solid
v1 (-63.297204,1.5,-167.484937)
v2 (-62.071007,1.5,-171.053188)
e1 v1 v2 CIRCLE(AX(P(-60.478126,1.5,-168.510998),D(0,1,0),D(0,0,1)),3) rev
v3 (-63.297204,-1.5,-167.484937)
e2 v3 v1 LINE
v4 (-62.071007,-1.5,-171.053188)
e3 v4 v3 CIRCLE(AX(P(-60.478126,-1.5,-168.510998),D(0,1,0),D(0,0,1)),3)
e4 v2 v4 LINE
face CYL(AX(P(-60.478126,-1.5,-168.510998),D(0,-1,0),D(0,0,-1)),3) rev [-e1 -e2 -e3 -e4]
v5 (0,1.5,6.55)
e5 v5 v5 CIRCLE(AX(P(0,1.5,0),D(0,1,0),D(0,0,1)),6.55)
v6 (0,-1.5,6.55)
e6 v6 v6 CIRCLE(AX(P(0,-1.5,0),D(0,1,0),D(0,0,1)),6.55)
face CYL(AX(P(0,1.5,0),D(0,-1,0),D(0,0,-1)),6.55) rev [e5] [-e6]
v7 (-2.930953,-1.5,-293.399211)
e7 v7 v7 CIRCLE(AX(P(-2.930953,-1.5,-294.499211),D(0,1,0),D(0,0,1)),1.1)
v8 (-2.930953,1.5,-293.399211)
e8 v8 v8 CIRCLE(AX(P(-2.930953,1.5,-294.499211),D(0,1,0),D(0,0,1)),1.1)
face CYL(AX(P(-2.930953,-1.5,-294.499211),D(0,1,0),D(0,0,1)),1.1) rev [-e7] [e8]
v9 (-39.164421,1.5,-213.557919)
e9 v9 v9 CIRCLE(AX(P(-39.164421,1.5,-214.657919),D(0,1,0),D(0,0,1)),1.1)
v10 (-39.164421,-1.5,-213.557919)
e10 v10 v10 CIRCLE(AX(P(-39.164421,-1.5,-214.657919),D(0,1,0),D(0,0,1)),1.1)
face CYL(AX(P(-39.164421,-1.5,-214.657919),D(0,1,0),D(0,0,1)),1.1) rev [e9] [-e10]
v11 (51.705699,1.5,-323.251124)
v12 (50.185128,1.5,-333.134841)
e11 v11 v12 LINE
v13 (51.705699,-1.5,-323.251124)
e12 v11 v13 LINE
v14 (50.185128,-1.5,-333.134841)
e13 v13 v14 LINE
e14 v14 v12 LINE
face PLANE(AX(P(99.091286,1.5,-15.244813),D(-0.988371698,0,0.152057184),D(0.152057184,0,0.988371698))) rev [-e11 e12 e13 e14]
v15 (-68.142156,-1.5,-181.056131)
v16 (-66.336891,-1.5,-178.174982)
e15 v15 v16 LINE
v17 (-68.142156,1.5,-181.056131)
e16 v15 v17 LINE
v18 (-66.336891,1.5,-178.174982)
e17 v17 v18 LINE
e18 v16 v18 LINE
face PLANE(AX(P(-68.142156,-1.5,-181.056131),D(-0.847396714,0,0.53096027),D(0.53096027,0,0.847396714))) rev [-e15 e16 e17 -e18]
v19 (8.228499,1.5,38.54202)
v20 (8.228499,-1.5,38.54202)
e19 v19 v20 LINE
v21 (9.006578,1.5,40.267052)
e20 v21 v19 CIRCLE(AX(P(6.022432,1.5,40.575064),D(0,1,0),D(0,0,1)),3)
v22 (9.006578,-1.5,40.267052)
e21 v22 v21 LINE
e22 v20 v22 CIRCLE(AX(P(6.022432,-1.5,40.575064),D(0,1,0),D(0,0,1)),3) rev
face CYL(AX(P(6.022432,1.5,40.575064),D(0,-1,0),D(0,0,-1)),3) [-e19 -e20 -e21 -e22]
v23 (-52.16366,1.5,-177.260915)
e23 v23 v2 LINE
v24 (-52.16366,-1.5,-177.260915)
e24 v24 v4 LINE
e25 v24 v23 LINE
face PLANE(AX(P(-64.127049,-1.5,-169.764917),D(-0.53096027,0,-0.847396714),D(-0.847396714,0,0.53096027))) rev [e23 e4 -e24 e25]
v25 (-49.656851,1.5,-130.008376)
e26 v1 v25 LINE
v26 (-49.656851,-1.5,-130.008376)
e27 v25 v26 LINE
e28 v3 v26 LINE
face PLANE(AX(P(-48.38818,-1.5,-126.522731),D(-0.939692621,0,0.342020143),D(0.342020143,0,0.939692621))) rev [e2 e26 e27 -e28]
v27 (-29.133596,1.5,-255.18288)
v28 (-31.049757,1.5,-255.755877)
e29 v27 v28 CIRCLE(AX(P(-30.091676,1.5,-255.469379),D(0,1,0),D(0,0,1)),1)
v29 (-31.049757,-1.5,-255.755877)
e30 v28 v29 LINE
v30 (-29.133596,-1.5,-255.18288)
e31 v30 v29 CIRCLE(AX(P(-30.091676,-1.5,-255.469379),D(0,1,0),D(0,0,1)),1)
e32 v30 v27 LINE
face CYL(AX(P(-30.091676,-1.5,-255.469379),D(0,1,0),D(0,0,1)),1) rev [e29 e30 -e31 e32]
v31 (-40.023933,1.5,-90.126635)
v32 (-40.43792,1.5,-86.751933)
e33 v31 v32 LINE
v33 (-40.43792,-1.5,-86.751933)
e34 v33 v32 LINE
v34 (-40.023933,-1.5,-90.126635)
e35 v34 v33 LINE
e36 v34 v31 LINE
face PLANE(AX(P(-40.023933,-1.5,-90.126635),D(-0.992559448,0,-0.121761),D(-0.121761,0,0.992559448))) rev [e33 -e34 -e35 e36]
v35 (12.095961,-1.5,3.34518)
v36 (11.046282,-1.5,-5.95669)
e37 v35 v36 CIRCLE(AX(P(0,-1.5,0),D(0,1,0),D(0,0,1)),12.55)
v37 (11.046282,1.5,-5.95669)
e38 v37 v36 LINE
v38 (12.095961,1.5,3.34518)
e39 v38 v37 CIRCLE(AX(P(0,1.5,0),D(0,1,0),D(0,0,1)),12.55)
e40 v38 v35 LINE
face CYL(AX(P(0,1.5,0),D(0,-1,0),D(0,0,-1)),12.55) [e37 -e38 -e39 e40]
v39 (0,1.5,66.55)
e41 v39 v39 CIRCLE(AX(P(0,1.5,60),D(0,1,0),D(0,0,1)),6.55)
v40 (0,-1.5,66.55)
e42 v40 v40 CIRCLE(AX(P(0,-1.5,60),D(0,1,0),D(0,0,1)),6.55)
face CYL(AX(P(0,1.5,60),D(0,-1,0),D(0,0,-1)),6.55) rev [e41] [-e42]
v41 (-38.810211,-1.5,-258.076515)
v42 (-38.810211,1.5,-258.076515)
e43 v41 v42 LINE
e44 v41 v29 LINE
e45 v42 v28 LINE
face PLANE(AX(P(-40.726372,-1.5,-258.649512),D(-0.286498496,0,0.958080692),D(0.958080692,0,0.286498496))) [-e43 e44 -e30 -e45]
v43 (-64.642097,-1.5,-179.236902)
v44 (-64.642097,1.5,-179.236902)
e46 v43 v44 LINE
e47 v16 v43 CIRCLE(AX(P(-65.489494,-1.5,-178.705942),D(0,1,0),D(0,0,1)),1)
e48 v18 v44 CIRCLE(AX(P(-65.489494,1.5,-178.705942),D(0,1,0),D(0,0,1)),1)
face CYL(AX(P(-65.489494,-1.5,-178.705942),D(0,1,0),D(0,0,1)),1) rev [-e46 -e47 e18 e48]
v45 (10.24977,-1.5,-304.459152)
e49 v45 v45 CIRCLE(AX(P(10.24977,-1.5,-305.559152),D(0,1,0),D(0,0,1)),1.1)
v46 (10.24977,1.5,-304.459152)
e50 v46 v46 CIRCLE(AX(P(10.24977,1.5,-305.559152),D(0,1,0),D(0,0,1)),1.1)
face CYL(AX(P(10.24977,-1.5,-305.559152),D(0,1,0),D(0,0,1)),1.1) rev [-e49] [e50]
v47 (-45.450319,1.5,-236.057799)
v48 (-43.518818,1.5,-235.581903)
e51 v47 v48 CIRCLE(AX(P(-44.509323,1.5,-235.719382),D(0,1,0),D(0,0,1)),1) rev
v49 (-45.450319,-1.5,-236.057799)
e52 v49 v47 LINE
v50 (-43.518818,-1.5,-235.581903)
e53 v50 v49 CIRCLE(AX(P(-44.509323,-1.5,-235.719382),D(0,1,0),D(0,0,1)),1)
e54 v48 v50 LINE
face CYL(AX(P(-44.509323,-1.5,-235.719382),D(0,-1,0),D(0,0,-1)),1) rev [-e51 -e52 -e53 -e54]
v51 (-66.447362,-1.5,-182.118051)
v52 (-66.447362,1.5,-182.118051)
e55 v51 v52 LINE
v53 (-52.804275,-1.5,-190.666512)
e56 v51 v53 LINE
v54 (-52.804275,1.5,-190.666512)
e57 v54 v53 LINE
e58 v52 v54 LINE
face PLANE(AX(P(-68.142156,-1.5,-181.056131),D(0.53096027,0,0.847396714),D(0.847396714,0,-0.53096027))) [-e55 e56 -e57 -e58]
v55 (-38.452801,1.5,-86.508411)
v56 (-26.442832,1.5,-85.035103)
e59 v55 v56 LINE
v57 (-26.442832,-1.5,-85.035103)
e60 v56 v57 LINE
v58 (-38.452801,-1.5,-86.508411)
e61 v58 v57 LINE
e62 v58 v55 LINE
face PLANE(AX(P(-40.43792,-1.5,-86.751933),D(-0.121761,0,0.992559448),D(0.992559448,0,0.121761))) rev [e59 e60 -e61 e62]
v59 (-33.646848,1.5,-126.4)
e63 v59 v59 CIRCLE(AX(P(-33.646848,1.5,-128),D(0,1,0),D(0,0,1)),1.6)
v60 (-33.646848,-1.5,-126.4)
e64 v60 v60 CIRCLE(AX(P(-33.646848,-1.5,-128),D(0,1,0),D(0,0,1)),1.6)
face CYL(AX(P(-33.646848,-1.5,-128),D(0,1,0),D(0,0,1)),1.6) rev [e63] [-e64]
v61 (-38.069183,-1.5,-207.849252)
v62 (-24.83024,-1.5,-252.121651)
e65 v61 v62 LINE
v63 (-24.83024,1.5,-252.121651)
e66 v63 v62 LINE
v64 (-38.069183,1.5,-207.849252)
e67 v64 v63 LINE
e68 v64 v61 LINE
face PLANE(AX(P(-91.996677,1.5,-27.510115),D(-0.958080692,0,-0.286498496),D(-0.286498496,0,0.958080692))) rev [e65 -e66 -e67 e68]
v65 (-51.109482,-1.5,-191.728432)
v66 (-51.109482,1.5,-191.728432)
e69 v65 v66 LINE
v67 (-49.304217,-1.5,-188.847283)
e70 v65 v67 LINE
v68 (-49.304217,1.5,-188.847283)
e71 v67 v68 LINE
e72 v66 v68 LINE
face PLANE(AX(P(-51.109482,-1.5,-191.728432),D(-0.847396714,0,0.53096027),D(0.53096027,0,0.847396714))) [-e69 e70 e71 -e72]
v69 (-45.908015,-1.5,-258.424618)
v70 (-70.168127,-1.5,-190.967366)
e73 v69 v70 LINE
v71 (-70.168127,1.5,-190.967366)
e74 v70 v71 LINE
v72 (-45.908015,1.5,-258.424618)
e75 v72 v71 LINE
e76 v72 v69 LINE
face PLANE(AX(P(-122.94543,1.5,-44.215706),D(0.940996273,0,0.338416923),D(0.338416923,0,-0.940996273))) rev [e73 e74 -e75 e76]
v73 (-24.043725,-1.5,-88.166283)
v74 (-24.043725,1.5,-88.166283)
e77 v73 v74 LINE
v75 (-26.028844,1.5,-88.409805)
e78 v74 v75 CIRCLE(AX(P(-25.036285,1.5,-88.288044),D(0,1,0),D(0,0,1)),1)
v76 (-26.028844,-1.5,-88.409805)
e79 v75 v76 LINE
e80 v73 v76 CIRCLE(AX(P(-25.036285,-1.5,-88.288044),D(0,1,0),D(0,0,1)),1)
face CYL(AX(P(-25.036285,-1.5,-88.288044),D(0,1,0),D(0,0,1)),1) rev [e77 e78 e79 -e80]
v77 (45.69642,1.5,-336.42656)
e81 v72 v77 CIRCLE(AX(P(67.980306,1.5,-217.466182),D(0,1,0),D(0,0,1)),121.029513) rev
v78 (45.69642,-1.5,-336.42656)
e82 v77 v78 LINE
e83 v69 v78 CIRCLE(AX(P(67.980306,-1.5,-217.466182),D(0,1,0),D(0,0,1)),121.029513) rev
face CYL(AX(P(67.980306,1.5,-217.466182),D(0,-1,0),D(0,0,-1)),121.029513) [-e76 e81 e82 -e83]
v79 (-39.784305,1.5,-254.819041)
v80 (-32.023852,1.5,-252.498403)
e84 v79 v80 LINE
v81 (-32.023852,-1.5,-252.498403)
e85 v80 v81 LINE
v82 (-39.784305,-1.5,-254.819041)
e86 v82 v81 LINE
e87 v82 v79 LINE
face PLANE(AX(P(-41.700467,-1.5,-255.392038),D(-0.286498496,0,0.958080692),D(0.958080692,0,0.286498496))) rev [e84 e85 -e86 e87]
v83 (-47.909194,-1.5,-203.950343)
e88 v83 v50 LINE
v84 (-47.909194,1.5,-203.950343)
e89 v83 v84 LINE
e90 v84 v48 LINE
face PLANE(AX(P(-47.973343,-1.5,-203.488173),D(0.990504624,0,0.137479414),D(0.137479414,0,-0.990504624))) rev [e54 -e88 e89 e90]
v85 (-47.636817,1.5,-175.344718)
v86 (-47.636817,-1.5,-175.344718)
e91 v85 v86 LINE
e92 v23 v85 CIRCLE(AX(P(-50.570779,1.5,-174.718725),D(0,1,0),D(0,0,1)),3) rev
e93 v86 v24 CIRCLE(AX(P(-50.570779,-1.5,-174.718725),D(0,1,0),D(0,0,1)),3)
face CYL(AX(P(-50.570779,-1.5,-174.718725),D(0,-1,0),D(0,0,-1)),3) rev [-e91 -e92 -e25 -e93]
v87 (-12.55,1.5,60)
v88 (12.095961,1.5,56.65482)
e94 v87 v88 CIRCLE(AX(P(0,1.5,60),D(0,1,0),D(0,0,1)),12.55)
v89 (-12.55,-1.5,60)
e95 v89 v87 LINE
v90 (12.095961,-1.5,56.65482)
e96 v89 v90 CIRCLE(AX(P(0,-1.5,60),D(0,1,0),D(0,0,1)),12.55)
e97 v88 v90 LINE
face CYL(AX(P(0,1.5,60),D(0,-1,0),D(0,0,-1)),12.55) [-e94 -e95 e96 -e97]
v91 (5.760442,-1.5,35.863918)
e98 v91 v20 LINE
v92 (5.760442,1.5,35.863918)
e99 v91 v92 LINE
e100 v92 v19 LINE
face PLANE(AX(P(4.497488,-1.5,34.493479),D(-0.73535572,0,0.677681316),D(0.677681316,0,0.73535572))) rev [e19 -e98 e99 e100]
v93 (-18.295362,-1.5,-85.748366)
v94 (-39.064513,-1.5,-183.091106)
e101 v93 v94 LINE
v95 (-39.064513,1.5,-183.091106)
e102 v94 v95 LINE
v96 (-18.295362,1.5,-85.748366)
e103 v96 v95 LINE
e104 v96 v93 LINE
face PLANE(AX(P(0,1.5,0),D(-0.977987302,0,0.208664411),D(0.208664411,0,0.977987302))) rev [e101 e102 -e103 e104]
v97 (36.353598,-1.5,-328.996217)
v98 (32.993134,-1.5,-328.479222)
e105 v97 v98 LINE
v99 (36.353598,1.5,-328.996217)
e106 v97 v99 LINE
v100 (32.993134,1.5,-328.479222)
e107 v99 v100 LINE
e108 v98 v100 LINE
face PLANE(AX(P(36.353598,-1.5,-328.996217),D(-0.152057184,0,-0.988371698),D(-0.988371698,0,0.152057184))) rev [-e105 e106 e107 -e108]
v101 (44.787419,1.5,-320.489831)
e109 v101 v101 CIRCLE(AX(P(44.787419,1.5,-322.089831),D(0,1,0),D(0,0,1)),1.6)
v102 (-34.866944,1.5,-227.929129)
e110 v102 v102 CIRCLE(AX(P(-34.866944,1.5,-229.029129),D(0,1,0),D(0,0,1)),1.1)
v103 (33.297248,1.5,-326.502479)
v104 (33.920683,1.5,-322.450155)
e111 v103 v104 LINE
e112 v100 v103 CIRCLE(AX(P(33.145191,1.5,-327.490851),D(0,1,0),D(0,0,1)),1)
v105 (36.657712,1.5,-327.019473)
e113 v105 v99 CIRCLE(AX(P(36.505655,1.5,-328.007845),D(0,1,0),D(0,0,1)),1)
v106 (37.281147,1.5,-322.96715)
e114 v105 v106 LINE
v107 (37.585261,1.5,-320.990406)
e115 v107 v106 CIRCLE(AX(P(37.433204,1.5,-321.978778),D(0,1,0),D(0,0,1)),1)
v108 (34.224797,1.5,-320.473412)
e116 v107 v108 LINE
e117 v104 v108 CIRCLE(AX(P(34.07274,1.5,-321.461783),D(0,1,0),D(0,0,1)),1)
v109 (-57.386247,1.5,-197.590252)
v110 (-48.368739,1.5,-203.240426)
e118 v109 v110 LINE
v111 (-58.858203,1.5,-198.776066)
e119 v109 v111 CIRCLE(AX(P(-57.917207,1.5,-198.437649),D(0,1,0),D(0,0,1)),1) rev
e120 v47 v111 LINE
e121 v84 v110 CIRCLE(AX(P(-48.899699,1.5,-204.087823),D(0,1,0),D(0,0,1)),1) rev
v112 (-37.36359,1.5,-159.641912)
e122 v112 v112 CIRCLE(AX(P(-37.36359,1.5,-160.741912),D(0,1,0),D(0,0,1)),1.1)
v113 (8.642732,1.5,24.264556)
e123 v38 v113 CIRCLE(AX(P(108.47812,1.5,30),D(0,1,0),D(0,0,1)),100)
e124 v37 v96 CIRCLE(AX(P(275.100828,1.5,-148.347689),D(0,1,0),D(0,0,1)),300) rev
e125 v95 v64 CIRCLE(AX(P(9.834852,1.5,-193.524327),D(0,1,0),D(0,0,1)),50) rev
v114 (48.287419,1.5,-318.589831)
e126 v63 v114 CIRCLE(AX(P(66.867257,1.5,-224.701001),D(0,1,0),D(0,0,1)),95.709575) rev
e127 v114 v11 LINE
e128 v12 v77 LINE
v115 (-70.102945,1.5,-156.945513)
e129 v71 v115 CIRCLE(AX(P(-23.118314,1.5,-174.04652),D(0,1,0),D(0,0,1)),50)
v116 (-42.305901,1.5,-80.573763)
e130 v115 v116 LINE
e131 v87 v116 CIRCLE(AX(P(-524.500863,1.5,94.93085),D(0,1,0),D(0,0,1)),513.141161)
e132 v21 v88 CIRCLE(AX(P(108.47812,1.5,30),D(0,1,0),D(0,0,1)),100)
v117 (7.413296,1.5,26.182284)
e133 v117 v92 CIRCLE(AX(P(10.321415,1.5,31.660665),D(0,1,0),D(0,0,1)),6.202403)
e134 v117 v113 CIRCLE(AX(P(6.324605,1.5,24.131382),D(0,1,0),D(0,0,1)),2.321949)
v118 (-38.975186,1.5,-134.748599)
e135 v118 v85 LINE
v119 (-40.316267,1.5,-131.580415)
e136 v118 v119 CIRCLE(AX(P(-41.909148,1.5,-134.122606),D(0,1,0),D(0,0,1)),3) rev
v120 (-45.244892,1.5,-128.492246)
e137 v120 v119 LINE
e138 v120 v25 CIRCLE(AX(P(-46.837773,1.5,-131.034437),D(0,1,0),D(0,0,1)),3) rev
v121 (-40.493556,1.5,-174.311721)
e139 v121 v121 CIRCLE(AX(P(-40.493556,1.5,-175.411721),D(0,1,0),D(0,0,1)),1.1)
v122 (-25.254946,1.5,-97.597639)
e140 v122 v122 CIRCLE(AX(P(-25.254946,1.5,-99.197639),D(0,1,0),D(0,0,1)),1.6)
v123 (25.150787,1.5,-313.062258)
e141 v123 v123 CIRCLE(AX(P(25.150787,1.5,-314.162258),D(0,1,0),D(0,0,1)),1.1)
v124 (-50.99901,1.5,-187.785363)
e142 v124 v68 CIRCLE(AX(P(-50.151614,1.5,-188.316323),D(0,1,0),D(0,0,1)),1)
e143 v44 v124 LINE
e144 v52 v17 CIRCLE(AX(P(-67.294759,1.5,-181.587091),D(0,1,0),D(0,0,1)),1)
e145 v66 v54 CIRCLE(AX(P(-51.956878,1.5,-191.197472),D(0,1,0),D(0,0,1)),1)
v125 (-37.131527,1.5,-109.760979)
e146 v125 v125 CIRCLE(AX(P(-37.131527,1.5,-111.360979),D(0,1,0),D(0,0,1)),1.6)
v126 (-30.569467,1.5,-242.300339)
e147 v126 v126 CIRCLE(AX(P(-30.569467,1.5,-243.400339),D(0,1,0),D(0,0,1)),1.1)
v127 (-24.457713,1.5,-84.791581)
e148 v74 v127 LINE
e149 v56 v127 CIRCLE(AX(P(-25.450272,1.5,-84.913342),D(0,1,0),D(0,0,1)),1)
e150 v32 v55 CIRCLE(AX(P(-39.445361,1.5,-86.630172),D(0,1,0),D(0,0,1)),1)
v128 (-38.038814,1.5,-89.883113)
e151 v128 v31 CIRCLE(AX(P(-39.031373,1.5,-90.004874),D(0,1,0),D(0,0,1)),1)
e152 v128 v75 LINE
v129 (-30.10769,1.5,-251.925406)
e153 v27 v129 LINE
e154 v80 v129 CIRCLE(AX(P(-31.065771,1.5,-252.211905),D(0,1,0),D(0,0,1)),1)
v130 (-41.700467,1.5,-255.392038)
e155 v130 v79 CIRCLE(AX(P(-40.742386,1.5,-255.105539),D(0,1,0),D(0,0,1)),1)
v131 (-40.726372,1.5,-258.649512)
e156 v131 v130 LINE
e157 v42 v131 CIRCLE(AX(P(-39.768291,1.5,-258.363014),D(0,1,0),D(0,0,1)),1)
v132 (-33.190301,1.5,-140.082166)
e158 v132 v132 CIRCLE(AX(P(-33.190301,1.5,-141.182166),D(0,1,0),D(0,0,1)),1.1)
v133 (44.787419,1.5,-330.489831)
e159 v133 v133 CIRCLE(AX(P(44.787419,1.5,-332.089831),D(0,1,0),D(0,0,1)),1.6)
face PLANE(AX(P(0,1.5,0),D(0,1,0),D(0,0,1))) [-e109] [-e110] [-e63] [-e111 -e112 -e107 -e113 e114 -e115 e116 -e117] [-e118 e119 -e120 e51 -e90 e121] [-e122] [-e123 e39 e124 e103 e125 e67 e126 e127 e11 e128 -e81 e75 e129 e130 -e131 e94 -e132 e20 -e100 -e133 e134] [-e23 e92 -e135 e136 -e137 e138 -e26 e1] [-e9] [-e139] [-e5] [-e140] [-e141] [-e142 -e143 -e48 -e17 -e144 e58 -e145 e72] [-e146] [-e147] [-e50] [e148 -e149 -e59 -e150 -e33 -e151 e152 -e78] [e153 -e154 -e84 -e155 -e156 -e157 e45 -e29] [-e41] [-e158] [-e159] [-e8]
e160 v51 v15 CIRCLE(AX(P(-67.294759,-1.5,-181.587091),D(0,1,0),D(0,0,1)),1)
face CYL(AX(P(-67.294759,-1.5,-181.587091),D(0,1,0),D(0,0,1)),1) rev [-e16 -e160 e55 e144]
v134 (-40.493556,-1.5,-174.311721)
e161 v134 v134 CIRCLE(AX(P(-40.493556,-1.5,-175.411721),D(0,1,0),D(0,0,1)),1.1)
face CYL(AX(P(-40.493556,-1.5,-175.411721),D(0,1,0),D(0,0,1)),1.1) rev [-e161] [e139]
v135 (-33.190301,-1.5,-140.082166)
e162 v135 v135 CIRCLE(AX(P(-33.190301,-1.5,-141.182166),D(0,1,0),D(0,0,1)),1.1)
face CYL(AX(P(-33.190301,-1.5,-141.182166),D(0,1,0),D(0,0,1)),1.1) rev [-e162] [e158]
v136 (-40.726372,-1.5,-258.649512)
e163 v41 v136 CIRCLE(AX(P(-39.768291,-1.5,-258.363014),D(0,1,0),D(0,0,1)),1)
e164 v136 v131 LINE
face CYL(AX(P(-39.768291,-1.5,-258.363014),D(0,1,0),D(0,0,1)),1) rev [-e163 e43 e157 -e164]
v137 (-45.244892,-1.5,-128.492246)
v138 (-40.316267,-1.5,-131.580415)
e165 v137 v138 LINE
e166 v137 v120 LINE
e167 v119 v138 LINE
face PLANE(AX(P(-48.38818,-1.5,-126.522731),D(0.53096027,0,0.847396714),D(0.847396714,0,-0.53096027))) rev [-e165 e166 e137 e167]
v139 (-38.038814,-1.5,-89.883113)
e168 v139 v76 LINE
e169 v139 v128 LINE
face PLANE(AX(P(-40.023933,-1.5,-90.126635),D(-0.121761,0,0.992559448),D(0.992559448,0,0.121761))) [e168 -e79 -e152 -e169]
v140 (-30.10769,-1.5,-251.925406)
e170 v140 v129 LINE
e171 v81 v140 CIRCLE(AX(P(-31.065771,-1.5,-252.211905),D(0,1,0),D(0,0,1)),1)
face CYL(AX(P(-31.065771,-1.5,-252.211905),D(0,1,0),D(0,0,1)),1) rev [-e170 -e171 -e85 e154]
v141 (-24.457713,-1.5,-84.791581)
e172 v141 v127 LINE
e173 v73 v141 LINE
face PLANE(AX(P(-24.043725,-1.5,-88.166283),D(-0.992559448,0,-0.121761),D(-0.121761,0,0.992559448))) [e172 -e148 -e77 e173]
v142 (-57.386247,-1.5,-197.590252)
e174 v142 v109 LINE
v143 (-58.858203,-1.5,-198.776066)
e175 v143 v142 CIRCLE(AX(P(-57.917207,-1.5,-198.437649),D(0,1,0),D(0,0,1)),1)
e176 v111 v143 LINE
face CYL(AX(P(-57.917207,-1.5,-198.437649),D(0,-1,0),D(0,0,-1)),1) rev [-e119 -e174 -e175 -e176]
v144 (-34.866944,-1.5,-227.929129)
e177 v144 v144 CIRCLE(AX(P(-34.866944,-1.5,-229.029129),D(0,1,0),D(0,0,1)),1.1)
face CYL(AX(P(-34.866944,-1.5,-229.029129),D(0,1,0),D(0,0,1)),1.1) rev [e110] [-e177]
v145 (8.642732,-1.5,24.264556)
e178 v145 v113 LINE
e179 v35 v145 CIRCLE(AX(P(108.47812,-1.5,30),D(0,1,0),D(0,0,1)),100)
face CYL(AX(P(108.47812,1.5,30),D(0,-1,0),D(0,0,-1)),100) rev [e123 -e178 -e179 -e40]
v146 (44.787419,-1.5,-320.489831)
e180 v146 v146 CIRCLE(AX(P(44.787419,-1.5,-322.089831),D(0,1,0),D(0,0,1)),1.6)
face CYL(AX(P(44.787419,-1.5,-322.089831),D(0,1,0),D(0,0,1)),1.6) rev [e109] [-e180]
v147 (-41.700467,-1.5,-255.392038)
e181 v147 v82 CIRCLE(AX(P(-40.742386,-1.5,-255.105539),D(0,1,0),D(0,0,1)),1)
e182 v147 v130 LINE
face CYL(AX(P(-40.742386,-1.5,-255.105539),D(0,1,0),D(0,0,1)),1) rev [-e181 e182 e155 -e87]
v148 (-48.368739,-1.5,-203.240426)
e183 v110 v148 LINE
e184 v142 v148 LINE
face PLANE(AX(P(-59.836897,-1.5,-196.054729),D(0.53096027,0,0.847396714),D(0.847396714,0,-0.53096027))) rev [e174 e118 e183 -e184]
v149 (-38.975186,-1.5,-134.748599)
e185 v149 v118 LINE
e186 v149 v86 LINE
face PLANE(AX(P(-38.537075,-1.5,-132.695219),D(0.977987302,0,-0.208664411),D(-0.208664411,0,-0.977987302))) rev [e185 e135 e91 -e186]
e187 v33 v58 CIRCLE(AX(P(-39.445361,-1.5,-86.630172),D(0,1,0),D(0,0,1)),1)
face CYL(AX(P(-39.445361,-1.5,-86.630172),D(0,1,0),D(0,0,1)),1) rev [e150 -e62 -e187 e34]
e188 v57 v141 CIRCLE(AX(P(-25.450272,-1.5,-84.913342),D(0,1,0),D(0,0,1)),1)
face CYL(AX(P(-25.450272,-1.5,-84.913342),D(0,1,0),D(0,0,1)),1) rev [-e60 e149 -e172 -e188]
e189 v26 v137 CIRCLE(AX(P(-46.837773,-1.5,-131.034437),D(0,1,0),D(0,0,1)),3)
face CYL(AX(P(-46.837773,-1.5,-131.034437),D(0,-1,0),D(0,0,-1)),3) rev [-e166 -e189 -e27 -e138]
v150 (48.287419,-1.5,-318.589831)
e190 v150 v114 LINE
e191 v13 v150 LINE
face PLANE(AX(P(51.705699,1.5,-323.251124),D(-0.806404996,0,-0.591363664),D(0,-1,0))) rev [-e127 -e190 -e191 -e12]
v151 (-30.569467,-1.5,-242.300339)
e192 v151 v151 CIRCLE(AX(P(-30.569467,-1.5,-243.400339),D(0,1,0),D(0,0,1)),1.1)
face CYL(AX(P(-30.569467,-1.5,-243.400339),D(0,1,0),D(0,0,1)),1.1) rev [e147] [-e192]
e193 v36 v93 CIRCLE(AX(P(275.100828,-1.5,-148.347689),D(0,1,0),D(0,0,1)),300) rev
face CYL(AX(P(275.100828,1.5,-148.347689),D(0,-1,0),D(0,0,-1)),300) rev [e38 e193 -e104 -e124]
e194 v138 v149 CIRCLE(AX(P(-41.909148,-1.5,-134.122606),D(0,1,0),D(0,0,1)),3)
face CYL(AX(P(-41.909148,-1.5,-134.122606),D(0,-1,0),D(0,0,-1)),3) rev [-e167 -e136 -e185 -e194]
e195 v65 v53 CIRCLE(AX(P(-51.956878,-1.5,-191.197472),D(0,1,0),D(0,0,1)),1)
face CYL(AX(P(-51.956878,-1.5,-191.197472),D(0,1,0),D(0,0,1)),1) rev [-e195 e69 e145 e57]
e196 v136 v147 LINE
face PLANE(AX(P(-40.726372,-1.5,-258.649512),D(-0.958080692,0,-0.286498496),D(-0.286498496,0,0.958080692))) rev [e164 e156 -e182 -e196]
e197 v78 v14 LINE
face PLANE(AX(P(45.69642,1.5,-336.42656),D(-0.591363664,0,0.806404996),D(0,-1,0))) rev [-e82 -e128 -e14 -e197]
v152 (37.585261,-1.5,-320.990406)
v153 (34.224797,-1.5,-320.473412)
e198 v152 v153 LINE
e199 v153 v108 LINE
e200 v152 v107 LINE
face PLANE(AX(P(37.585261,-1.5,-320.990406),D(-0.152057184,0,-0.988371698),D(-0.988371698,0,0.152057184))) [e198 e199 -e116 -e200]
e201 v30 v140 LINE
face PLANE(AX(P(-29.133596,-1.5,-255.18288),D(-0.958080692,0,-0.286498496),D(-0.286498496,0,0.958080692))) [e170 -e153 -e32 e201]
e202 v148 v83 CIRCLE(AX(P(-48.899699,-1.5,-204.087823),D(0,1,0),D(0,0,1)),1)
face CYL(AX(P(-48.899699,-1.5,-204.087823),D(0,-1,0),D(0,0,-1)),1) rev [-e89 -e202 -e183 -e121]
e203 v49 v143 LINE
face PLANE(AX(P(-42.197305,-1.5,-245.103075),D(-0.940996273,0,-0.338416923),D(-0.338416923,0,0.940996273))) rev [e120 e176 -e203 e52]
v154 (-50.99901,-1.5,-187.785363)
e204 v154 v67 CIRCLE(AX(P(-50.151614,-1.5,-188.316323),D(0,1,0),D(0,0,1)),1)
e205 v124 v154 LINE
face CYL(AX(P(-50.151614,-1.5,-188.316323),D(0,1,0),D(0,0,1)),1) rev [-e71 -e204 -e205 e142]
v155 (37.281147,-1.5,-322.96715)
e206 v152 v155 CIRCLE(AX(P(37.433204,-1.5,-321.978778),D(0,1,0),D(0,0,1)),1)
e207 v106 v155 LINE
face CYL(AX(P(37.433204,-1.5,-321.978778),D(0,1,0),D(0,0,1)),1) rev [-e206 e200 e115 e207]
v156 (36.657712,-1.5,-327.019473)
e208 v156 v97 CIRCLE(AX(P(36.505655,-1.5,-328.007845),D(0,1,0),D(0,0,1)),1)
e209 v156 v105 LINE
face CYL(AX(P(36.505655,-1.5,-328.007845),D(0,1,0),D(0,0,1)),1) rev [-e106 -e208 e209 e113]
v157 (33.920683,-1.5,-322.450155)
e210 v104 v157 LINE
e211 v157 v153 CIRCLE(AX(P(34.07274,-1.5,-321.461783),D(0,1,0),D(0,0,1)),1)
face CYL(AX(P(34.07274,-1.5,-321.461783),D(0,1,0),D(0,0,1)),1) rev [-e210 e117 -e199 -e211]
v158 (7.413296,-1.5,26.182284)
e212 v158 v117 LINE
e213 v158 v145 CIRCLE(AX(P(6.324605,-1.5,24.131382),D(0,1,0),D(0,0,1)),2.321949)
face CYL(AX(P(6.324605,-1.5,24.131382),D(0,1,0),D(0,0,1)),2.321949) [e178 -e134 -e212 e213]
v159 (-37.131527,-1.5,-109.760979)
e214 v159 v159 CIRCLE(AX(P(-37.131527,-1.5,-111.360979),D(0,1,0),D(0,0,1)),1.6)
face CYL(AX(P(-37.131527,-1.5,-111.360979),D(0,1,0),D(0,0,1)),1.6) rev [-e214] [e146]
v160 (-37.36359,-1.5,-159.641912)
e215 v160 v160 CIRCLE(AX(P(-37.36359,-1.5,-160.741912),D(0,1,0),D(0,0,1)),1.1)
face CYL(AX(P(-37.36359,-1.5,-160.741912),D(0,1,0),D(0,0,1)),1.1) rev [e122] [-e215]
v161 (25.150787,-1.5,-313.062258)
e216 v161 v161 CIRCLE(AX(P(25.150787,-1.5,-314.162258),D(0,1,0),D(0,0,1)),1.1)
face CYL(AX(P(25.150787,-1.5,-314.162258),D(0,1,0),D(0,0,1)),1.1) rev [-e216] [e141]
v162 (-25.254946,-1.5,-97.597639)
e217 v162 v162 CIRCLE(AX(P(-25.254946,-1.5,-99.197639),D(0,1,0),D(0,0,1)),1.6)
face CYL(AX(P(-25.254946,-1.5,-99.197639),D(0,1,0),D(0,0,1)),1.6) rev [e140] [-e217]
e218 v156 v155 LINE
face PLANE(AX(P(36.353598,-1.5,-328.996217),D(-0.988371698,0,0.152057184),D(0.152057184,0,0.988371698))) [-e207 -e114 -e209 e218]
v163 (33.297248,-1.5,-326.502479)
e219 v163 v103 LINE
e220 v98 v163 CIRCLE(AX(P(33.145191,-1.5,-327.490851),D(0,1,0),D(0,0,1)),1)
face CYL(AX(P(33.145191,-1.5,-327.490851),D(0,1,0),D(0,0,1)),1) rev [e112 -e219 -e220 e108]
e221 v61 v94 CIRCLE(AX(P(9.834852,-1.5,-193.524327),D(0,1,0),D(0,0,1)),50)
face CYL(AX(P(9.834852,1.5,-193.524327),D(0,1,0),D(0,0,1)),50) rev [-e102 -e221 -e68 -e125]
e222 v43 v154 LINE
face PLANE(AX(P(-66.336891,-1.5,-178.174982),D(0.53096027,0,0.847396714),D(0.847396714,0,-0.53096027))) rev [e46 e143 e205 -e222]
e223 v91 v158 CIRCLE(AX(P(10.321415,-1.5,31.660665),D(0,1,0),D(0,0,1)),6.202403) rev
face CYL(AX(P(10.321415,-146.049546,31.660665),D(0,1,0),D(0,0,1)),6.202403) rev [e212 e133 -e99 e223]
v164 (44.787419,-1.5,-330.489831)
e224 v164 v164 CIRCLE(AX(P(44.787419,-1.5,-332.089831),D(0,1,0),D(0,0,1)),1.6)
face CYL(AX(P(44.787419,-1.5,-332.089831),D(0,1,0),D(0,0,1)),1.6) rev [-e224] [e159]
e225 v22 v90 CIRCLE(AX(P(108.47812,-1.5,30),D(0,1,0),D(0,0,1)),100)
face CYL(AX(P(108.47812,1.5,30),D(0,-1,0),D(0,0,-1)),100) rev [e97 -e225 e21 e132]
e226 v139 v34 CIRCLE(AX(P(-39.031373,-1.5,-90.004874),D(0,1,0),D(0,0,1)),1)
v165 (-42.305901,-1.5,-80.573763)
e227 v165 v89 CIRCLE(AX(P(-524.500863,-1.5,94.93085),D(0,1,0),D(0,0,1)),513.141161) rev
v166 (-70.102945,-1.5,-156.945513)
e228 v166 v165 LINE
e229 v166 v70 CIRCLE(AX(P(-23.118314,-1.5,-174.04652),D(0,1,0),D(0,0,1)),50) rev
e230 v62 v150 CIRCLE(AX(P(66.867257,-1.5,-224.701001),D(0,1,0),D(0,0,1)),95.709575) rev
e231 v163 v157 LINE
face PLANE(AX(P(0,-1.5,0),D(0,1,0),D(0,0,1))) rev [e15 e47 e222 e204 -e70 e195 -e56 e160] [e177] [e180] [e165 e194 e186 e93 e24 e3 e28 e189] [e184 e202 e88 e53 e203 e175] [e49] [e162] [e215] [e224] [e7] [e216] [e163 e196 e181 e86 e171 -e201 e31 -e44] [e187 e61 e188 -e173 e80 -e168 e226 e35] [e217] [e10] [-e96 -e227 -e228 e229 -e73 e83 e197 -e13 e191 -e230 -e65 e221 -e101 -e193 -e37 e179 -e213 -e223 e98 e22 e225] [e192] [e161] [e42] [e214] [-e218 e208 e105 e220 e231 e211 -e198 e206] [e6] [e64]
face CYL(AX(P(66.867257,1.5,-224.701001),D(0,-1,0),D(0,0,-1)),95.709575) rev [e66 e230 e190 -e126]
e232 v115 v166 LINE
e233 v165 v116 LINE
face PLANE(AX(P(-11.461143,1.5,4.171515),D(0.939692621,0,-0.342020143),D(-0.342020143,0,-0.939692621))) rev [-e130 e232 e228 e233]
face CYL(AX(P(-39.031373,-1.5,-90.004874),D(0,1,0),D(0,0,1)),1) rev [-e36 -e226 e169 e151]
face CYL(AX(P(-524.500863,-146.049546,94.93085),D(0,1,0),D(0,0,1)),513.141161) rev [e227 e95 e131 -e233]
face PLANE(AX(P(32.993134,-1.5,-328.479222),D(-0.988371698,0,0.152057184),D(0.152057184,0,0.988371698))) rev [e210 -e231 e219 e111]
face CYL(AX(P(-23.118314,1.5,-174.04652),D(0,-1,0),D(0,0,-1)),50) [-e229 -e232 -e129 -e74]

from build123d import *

# Parameters (mm, degrees)
SKETCH_3_R          = 6.55
EXTRUDE_1_DEPTH     = 1.5
CUT_EXTRUDE_3_DEPTH = 346.626566427
EXTRUDE_2_DEPTH     = 3
CHAMFER_1_SIZE      = 4
SKETCH_8_R          = 1
SKETCH_8_R_2        = 1.6
CUT_EXTRUDE_6_DEPTH = 345.981177834
SKETCH_9_R          = 1.1
SKETCH_9_R_2        = 1.6
CUT_EXTRUDE_7_DEPTH = 345.981177834
CUT_EXTRUDE_8_DEPTH = 345.981177834
FILLET_4_R          = 50
FILLET_5_R          = 3
FILLET_6_R          = 1
EXTRUDE_3_DEPTH     = 3


with BuildPart() as part:
    # 草图3 → 凸台-拉伸1 (new, symmetric)
    # profile 1 of 2: a face of its own
    with BuildSketch(Plane(origin=(0, 0, 0), x_dir=(1, 0, 0), z_dir=(0, 1, 0))):
        with BuildLine():
            ThreePointArc((11.046281859, 5.956690113), (-6.46534327, 44.807884696), (-18.295362458, 85.748365655))
            Line((-18.295362458, 85.748365655), (-41.732882117, 195.59746049))
            Line((-41.732882117, 195.59746049), (-24.830239517, 252.12165071))
            ThreePointArc((-24.830239517, 252.12165071), (4.01455016, 296.880361934), (52.313928116, 319.29763677))
            Line((52.313928116, 319.29763677), (49.5768988, 337.088327327))
            ThreePointArc((49.5768988, 337.088327327), (-8.975981148, 310.878563044), (-45.908014731, 258.424617632))
            Line((-45.908014731, 258.424617632), (-76.290123868, 173.944647702))
            Line((-76.290123868, 173.944647702), (-14.508857835, 4.202014333))
            ThreePointArc((-14.508857835, 4.202014333), (-13.227629582, 0.452324895), (-12.09596095, -3.34517992))
            ThreePointArc((-12.09596095, -3.34517992), (-4.680454366, 11.644562977), (11.046281859, 5.956690113))
        make_face()
    # profile 2 of 2: a face of its own
    with BuildSketch(Plane(origin=(0, 0, 0), x_dir=(1, 0, 0), z_dir=(0, 1, 0))):
        with BuildLine():
            ThreePointArc((12.09596095, -3.34517992), (8.478119914, -30), (12.09596095, -56.65482008))
            ThreePointArc((12.09596095, -56.65482008), (0, -72.55), (-12.09596095, -56.65482008))
            ThreePointArc((-12.09596095, -56.65482008), (-8.478119914, -30), (-12.09596095, -3.34517992))
            ThreePointArc((-12.09596095, -3.34517992), (0, 12.55), (12.09596095, -3.34517992))
        make_face()
        with Locations(Location((0, 0, 0), (0, 0, 270))):
            Circle(SKETCH_3_R, mode=Mode.SUBTRACT)
        with Locations(Location((0, -60, 0), (0, 0, 270))):
            Circle(SKETCH_3_R, mode=Mode.SUBTRACT)
    extrude(amount=EXTRUDE_1_DEPTH, both=True)

    # 草图7 → 切除-拉伸3 (cut, through all)
    with BuildSketch(Plane(origin=(0, 1.5, 0), x_dir=(1, 0, 0), z_dir=(0, 1, 0))):
        with BuildLine():
            Line((4.497487802, -34.493479197), (8.909760465, -39.281260509))
            ThreePointArc((8.909760465, -39.281260509), (8.493926314, -31.777928612), (8.642731975, -24.264556235))
            ThreePointArc((8.642731975, -24.264556235), (7.765481215, -25.952185157), (5.921402859, -26.418055622))
            ThreePointArc((5.921402859, -26.418055622), (1.171733543, -29.743809881), (4.497487802, -34.493479197))
        make_face()
    extrude(amount=-CUT_EXTRUDE_3_DEPTH, mode=Mode.SUBTRACT)

    # 草图7<3> → 凸台-拉伸2 (add)
    with BuildSketch(Plane(origin=(0, 1.5, 0), x_dir=(1, 0, 0), z_dir=(0, 1, 0))):
        with BuildLine():
            ThreePointArc((-8.909760465, -39.281260509), (-8.493926314, -31.777928612), (-8.642731975, -24.264556235))
            ThreePointArc((-8.642731975, -24.264556235), (-8.806680236, -25.524578384), (-9.419131852, -26.637878822))
            ThreePointArc((-9.419131852, -26.637878822), (-10.758632644, -29.837669281), (-10.103316411, -33.24405769))
            ThreePointArc((-10.103316411, -33.24405769), (-9.068630527, -36.176084637), (-8.909760465, -39.281260509))
        make_face()
    extrude(amount=-EXTRUDE_2_DEPTH)

    # 倒角1
    # the kernel refuses this chamfer: 4 mm, written as the material it takes off along each edge
    with BuildSketch(Plane(origin=(49.5768988, -11.786731952, -337.088327327), x_dir=(-0.9857681497508005, 0, 0.16811054380045146), z_dir=(0, 1, 0))) as chamfer_1_piece_1:
        with BuildLine():
            Line((3.936502909, 0), (CHAMFER_1_SIZE * 0.0162625743907, CHAMFER_1_SIZE * 0.999867755593))
            Line((CHAMFER_1_SIZE * 0.0162625743907, CHAMFER_1_SIZE * 0.999867755593), (0, 0))
            ThreePointArc((0, 0), (2.023873499, -0.015992695), (3.936502909, 0))
        make_face()
    extrude(amount=23.573463904, mode=Mode.SUBTRACT)
    with BuildSketch(Plane(origin=(52.313928116, -12.013080834, -319.29763677), x_dir=(-0.15205718425393844, 0, -0.9883716976506176), z_dir=(0, 1, 0))) as chamfer_1_piece_2:
        with BuildLine():
            Line((CHAMFER_1_SIZE, 0), (-0.087315026, 4.087315025))
            ThreePointArc((-0.087315026, 4.087315025), (-0.023083391, 2.101920628), (0, 0))
            Line((0, 0), (CHAMFER_1_SIZE, 0))
        make_face()
    extrude(amount=24.026161669, mode=Mode.SUBTRACT)

    # 草图8 → 切除-拉伸6 (cut, through all)
    with BuildSketch(Plane(origin=(0, 1.5, 0), x_dir=(1, 0, 0), z_dir=(0, 1, 0))):
        with Locations((37.433203796, 321.978777823)):
            Circle(SKETCH_8_R)
        with Locations((36.505654972, 328.007845179)):
            Circle(SKETCH_8_R)
        with Locations((33.1451912, 327.490850752)):
            Circle(SKETCH_8_R)
        with Locations((34.072740024, 321.461783396)):
            Circle(SKETCH_8_R)
        with Locations(Location((44.787418503, 332.089831456, 0), (0, 0, 270))):
            Circle(SKETCH_8_R_2)
        with Locations(Location((44.787418503, 322.089831456, 0), (0, 0, 270))):
            Circle(SKETCH_8_R_2)
        with Locations((-39.768291207, 258.363013678)):
            Circle(SKETCH_8_R)
        with Locations((-40.742386095, 255.105539327)):
            Circle(SKETCH_8_R)
        with Locations((-30.091676222, 255.469378864)):
            Circle(SKETCH_8_R)
        with Locations((-31.06577111, 252.211904513)):
            Circle(SKETCH_8_R)
        with Locations((-67.294758965, 181.587091045)):
            Circle(SKETCH_8_R)
        with Locations((-65.489494047, 178.705942216)):
            Circle(SKETCH_8_R)
        with Locations((-51.956878434, 191.197471934)):
            Circle(SKETCH_8_R)
        with Locations((-50.151613516, 188.316323105)):
            Circle(SKETCH_8_R)
        with Locations((-25.036284897, 88.28804372)):
            Circle(SKETCH_8_R)
        with Locations((-25.450272298, 84.913341595)):
            Circle(SKETCH_8_R)
        with Locations((-39.031373121, 90.004873825)):
            Circle(SKETCH_8_R)
        with Locations((-39.445360522, 86.6301717)):
            Circle(SKETCH_8_R)
        Polygon((36.353597787, 328.996216876), (37.58526098, 320.990406125), (34.224797208, 320.473411699), (32.993134015, 328.47922245), align=None)
        Polygon((-40.726371898, 258.649512175), (-29.133595531, 255.182880368), (-30.107690419, 251.925406016), (-41.700466786, 255.392037824), align=None)
        Polygon((-68.142155679, 181.056130775), (-51.10948172, 191.728432204), (-49.304216802, 188.847283375), (-66.336890761, 178.174981946), align=None)
        Polygon((-40.02393257, 90.126634825), (-24.043725449, 88.16628272), (-24.45771285, 84.791580595), (-40.437919971, 86.7519327), align=None)
    extrude(amount=-CUT_EXTRUDE_6_DEPTH, mode=Mode.SUBTRACT)

    # 草图9 → 切除-拉伸7 (cut, through all)
    with BuildSketch(Plane(origin=(0, 1.5, 0), x_dir=(1, 0, 0), z_dir=(0, 1, 0))):
        with Locations(Location((-30.569466556, 243.400339284, 0), (0, 0, 270))):
            Circle(SKETCH_9_R)
        with Locations(Location((25.150787489, 314.162258091, 0), (0, 0, 270))):
            Circle(SKETCH_9_R)
        with Locations(Location((10.249770173, 305.559151733, 0), (0, 0, 270))):
            Circle(SKETCH_9_R)
        with Locations(Location((-34.866944003, 229.02912891, 0), (0, 0, 270))):
            Circle(SKETCH_9_R)
        with Locations(Location((-2.930953467, 294.499211388, 0), (0, 0, 270))):
            Circle(SKETCH_9_R)
        with Locations(Location((-39.16442145, 214.657918537, 0), (0, 0, 270))):
            Circle(SKETCH_9_R)
        with Locations(Location((-40.493555813, 175.411721209, 0), (0, 0, 270))):
            Circle(SKETCH_9_R)
        with Locations(Location((-37.363589654, 160.741911673, 0), (0, 0, 270))):
            Circle(SKETCH_9_R)
        with Locations(Location((-33.190301442, 141.182165624, 0), (0, 0, 270))):
            Circle(SKETCH_9_R)
        with Locations(Location((-33.646848365, 128, 0), (0, 0, 270))):
            Circle(SKETCH_9_R_2)
        with Locations(Location((-25.254946433, 99.197639299, 0), (0, 0, 270))):
            Circle(SKETCH_9_R_2)
        with Locations(Location((-37.131526919, 111.360979134, 0), (0, 0, 270))):
            Circle(SKETCH_9_R_2)
    extrude(amount=-CUT_EXTRUDE_7_DEPTH, mode=Mode.SUBTRACT)

    # 草图10 → 切除-拉伸8 (cut, through all)
    with BuildSketch(Plane(origin=(0, 1.5, 0), x_dir=(1, 0, 0), z_dir=(0, 1, 0))):
        Polygon((-42.197304508, 245.103074872), (-59.836896552, 196.054728732), (-47.97334255, 203.488172514), align=None)
        Polygon((-64.127048511, 169.764916812), (-48.531264313, 179.536894505), (-38.537074534, 132.695218557), (-48.388180029, 126.522731048), align=None)
    extrude(amount=-CUT_EXTRUDE_8_DEPTH, mode=Mode.SUBTRACT)

    # 圆角4
    fillet_4_edges = [part.edges().sort_by_distance(p)[0] for p in [
        (-41.732882117, 0, -195.59746049),
        (-76.290123868, 0, -173.944647702),
    ]]
    fillet(fillet_4_edges, radius=FILLET_4_R)

    # 圆角5
    fillet_5_edges = [part.edges().sort_by_distance(p)[0] for p in [
        (-48.388180029, 0, -126.522731048),
        (-64.127048511, 0, -169.764916812),
        (-48.531264313, 0, -179.536894505),
        (-38.537074534, 0, -132.695218557),
        (4.497487802, 0, 34.493479197),
        (8.909760465, 0, 39.281260509),
    ]]
    fillet(fillet_5_edges, radius=FILLET_5_R)

    # 圆角6
    fillet_6_edges = [part.edges().sort_by_distance(p)[0] for p in [
        (-42.197304508, 0, -245.103074872),
        (-47.97334255, 0, -203.488172514),
        (-59.836896552, 0, -196.054728732),
    ]]
    fillet(fillet_6_edges, radius=FILLET_6_R)

    # 草图11 → 凸台-拉伸3 (add)
    with BuildSketch(Plane(origin=(0, 1.5, 0), x_dir=(1, 0, 0), z_dir=(0, 1, 0))):
        with BuildLine():
            ThreePointArc((3.862363202, -34.328152946), (4.521977485, -34.653012522), (5.082760511, -35.12856183))
            Line((5.082760511, -35.12856183), (5.760441827, -35.863917549))
            ThreePointArc((5.760441827, -35.863917549), (4.207468493, -30.616888071), (7.413296366, -26.182284124))
            ThreePointArc((7.413296366, -26.182284124), (6.687056269, -26.42486787), (5.921402859, -26.418055622))
            ThreePointArc((5.921402859, -26.418055622), (1.241668153, -29.422934282), (3.862363202, -34.328152946))
        make_face()
        with BuildLine():
            Line((-14.508857835, 4.202014333), (-42.305901268, 80.573763491))
            ThreePointArc((-42.305901268, 80.573763491), (-22.483207982, 11.333558383), (-12.55, -60))
            ThreePointArc((-12.55, -60), (-12.435972216, -58.312073746), (-12.09596095, -56.65482008))
            ThreePointArc((-12.09596095, -56.65482008), (-10.118516623, -48.038526559), (-8.909760465, -39.281260509))
            ThreePointArc((-8.909760465, -39.281260509), (-9.068630527, -36.176084637), (-10.103316411, -33.24405769))
            ThreePointArc((-10.103316411, -33.24405769), (-10.758632644, -29.837669281), (-9.419131852, -26.637878822))
            ThreePointArc((-9.419131852, -26.637878822), (-8.806680236, -25.524578384), (-8.642731975, -24.264556235))
            ThreePointArc((-8.642731975, -24.264556235), (-10.536060501, -9.817012165), (-14.508857835, 4.202014333))
        make_face()
    extrude(amount=-EXTRUDE_3_DEPTH)


solid = part.part
